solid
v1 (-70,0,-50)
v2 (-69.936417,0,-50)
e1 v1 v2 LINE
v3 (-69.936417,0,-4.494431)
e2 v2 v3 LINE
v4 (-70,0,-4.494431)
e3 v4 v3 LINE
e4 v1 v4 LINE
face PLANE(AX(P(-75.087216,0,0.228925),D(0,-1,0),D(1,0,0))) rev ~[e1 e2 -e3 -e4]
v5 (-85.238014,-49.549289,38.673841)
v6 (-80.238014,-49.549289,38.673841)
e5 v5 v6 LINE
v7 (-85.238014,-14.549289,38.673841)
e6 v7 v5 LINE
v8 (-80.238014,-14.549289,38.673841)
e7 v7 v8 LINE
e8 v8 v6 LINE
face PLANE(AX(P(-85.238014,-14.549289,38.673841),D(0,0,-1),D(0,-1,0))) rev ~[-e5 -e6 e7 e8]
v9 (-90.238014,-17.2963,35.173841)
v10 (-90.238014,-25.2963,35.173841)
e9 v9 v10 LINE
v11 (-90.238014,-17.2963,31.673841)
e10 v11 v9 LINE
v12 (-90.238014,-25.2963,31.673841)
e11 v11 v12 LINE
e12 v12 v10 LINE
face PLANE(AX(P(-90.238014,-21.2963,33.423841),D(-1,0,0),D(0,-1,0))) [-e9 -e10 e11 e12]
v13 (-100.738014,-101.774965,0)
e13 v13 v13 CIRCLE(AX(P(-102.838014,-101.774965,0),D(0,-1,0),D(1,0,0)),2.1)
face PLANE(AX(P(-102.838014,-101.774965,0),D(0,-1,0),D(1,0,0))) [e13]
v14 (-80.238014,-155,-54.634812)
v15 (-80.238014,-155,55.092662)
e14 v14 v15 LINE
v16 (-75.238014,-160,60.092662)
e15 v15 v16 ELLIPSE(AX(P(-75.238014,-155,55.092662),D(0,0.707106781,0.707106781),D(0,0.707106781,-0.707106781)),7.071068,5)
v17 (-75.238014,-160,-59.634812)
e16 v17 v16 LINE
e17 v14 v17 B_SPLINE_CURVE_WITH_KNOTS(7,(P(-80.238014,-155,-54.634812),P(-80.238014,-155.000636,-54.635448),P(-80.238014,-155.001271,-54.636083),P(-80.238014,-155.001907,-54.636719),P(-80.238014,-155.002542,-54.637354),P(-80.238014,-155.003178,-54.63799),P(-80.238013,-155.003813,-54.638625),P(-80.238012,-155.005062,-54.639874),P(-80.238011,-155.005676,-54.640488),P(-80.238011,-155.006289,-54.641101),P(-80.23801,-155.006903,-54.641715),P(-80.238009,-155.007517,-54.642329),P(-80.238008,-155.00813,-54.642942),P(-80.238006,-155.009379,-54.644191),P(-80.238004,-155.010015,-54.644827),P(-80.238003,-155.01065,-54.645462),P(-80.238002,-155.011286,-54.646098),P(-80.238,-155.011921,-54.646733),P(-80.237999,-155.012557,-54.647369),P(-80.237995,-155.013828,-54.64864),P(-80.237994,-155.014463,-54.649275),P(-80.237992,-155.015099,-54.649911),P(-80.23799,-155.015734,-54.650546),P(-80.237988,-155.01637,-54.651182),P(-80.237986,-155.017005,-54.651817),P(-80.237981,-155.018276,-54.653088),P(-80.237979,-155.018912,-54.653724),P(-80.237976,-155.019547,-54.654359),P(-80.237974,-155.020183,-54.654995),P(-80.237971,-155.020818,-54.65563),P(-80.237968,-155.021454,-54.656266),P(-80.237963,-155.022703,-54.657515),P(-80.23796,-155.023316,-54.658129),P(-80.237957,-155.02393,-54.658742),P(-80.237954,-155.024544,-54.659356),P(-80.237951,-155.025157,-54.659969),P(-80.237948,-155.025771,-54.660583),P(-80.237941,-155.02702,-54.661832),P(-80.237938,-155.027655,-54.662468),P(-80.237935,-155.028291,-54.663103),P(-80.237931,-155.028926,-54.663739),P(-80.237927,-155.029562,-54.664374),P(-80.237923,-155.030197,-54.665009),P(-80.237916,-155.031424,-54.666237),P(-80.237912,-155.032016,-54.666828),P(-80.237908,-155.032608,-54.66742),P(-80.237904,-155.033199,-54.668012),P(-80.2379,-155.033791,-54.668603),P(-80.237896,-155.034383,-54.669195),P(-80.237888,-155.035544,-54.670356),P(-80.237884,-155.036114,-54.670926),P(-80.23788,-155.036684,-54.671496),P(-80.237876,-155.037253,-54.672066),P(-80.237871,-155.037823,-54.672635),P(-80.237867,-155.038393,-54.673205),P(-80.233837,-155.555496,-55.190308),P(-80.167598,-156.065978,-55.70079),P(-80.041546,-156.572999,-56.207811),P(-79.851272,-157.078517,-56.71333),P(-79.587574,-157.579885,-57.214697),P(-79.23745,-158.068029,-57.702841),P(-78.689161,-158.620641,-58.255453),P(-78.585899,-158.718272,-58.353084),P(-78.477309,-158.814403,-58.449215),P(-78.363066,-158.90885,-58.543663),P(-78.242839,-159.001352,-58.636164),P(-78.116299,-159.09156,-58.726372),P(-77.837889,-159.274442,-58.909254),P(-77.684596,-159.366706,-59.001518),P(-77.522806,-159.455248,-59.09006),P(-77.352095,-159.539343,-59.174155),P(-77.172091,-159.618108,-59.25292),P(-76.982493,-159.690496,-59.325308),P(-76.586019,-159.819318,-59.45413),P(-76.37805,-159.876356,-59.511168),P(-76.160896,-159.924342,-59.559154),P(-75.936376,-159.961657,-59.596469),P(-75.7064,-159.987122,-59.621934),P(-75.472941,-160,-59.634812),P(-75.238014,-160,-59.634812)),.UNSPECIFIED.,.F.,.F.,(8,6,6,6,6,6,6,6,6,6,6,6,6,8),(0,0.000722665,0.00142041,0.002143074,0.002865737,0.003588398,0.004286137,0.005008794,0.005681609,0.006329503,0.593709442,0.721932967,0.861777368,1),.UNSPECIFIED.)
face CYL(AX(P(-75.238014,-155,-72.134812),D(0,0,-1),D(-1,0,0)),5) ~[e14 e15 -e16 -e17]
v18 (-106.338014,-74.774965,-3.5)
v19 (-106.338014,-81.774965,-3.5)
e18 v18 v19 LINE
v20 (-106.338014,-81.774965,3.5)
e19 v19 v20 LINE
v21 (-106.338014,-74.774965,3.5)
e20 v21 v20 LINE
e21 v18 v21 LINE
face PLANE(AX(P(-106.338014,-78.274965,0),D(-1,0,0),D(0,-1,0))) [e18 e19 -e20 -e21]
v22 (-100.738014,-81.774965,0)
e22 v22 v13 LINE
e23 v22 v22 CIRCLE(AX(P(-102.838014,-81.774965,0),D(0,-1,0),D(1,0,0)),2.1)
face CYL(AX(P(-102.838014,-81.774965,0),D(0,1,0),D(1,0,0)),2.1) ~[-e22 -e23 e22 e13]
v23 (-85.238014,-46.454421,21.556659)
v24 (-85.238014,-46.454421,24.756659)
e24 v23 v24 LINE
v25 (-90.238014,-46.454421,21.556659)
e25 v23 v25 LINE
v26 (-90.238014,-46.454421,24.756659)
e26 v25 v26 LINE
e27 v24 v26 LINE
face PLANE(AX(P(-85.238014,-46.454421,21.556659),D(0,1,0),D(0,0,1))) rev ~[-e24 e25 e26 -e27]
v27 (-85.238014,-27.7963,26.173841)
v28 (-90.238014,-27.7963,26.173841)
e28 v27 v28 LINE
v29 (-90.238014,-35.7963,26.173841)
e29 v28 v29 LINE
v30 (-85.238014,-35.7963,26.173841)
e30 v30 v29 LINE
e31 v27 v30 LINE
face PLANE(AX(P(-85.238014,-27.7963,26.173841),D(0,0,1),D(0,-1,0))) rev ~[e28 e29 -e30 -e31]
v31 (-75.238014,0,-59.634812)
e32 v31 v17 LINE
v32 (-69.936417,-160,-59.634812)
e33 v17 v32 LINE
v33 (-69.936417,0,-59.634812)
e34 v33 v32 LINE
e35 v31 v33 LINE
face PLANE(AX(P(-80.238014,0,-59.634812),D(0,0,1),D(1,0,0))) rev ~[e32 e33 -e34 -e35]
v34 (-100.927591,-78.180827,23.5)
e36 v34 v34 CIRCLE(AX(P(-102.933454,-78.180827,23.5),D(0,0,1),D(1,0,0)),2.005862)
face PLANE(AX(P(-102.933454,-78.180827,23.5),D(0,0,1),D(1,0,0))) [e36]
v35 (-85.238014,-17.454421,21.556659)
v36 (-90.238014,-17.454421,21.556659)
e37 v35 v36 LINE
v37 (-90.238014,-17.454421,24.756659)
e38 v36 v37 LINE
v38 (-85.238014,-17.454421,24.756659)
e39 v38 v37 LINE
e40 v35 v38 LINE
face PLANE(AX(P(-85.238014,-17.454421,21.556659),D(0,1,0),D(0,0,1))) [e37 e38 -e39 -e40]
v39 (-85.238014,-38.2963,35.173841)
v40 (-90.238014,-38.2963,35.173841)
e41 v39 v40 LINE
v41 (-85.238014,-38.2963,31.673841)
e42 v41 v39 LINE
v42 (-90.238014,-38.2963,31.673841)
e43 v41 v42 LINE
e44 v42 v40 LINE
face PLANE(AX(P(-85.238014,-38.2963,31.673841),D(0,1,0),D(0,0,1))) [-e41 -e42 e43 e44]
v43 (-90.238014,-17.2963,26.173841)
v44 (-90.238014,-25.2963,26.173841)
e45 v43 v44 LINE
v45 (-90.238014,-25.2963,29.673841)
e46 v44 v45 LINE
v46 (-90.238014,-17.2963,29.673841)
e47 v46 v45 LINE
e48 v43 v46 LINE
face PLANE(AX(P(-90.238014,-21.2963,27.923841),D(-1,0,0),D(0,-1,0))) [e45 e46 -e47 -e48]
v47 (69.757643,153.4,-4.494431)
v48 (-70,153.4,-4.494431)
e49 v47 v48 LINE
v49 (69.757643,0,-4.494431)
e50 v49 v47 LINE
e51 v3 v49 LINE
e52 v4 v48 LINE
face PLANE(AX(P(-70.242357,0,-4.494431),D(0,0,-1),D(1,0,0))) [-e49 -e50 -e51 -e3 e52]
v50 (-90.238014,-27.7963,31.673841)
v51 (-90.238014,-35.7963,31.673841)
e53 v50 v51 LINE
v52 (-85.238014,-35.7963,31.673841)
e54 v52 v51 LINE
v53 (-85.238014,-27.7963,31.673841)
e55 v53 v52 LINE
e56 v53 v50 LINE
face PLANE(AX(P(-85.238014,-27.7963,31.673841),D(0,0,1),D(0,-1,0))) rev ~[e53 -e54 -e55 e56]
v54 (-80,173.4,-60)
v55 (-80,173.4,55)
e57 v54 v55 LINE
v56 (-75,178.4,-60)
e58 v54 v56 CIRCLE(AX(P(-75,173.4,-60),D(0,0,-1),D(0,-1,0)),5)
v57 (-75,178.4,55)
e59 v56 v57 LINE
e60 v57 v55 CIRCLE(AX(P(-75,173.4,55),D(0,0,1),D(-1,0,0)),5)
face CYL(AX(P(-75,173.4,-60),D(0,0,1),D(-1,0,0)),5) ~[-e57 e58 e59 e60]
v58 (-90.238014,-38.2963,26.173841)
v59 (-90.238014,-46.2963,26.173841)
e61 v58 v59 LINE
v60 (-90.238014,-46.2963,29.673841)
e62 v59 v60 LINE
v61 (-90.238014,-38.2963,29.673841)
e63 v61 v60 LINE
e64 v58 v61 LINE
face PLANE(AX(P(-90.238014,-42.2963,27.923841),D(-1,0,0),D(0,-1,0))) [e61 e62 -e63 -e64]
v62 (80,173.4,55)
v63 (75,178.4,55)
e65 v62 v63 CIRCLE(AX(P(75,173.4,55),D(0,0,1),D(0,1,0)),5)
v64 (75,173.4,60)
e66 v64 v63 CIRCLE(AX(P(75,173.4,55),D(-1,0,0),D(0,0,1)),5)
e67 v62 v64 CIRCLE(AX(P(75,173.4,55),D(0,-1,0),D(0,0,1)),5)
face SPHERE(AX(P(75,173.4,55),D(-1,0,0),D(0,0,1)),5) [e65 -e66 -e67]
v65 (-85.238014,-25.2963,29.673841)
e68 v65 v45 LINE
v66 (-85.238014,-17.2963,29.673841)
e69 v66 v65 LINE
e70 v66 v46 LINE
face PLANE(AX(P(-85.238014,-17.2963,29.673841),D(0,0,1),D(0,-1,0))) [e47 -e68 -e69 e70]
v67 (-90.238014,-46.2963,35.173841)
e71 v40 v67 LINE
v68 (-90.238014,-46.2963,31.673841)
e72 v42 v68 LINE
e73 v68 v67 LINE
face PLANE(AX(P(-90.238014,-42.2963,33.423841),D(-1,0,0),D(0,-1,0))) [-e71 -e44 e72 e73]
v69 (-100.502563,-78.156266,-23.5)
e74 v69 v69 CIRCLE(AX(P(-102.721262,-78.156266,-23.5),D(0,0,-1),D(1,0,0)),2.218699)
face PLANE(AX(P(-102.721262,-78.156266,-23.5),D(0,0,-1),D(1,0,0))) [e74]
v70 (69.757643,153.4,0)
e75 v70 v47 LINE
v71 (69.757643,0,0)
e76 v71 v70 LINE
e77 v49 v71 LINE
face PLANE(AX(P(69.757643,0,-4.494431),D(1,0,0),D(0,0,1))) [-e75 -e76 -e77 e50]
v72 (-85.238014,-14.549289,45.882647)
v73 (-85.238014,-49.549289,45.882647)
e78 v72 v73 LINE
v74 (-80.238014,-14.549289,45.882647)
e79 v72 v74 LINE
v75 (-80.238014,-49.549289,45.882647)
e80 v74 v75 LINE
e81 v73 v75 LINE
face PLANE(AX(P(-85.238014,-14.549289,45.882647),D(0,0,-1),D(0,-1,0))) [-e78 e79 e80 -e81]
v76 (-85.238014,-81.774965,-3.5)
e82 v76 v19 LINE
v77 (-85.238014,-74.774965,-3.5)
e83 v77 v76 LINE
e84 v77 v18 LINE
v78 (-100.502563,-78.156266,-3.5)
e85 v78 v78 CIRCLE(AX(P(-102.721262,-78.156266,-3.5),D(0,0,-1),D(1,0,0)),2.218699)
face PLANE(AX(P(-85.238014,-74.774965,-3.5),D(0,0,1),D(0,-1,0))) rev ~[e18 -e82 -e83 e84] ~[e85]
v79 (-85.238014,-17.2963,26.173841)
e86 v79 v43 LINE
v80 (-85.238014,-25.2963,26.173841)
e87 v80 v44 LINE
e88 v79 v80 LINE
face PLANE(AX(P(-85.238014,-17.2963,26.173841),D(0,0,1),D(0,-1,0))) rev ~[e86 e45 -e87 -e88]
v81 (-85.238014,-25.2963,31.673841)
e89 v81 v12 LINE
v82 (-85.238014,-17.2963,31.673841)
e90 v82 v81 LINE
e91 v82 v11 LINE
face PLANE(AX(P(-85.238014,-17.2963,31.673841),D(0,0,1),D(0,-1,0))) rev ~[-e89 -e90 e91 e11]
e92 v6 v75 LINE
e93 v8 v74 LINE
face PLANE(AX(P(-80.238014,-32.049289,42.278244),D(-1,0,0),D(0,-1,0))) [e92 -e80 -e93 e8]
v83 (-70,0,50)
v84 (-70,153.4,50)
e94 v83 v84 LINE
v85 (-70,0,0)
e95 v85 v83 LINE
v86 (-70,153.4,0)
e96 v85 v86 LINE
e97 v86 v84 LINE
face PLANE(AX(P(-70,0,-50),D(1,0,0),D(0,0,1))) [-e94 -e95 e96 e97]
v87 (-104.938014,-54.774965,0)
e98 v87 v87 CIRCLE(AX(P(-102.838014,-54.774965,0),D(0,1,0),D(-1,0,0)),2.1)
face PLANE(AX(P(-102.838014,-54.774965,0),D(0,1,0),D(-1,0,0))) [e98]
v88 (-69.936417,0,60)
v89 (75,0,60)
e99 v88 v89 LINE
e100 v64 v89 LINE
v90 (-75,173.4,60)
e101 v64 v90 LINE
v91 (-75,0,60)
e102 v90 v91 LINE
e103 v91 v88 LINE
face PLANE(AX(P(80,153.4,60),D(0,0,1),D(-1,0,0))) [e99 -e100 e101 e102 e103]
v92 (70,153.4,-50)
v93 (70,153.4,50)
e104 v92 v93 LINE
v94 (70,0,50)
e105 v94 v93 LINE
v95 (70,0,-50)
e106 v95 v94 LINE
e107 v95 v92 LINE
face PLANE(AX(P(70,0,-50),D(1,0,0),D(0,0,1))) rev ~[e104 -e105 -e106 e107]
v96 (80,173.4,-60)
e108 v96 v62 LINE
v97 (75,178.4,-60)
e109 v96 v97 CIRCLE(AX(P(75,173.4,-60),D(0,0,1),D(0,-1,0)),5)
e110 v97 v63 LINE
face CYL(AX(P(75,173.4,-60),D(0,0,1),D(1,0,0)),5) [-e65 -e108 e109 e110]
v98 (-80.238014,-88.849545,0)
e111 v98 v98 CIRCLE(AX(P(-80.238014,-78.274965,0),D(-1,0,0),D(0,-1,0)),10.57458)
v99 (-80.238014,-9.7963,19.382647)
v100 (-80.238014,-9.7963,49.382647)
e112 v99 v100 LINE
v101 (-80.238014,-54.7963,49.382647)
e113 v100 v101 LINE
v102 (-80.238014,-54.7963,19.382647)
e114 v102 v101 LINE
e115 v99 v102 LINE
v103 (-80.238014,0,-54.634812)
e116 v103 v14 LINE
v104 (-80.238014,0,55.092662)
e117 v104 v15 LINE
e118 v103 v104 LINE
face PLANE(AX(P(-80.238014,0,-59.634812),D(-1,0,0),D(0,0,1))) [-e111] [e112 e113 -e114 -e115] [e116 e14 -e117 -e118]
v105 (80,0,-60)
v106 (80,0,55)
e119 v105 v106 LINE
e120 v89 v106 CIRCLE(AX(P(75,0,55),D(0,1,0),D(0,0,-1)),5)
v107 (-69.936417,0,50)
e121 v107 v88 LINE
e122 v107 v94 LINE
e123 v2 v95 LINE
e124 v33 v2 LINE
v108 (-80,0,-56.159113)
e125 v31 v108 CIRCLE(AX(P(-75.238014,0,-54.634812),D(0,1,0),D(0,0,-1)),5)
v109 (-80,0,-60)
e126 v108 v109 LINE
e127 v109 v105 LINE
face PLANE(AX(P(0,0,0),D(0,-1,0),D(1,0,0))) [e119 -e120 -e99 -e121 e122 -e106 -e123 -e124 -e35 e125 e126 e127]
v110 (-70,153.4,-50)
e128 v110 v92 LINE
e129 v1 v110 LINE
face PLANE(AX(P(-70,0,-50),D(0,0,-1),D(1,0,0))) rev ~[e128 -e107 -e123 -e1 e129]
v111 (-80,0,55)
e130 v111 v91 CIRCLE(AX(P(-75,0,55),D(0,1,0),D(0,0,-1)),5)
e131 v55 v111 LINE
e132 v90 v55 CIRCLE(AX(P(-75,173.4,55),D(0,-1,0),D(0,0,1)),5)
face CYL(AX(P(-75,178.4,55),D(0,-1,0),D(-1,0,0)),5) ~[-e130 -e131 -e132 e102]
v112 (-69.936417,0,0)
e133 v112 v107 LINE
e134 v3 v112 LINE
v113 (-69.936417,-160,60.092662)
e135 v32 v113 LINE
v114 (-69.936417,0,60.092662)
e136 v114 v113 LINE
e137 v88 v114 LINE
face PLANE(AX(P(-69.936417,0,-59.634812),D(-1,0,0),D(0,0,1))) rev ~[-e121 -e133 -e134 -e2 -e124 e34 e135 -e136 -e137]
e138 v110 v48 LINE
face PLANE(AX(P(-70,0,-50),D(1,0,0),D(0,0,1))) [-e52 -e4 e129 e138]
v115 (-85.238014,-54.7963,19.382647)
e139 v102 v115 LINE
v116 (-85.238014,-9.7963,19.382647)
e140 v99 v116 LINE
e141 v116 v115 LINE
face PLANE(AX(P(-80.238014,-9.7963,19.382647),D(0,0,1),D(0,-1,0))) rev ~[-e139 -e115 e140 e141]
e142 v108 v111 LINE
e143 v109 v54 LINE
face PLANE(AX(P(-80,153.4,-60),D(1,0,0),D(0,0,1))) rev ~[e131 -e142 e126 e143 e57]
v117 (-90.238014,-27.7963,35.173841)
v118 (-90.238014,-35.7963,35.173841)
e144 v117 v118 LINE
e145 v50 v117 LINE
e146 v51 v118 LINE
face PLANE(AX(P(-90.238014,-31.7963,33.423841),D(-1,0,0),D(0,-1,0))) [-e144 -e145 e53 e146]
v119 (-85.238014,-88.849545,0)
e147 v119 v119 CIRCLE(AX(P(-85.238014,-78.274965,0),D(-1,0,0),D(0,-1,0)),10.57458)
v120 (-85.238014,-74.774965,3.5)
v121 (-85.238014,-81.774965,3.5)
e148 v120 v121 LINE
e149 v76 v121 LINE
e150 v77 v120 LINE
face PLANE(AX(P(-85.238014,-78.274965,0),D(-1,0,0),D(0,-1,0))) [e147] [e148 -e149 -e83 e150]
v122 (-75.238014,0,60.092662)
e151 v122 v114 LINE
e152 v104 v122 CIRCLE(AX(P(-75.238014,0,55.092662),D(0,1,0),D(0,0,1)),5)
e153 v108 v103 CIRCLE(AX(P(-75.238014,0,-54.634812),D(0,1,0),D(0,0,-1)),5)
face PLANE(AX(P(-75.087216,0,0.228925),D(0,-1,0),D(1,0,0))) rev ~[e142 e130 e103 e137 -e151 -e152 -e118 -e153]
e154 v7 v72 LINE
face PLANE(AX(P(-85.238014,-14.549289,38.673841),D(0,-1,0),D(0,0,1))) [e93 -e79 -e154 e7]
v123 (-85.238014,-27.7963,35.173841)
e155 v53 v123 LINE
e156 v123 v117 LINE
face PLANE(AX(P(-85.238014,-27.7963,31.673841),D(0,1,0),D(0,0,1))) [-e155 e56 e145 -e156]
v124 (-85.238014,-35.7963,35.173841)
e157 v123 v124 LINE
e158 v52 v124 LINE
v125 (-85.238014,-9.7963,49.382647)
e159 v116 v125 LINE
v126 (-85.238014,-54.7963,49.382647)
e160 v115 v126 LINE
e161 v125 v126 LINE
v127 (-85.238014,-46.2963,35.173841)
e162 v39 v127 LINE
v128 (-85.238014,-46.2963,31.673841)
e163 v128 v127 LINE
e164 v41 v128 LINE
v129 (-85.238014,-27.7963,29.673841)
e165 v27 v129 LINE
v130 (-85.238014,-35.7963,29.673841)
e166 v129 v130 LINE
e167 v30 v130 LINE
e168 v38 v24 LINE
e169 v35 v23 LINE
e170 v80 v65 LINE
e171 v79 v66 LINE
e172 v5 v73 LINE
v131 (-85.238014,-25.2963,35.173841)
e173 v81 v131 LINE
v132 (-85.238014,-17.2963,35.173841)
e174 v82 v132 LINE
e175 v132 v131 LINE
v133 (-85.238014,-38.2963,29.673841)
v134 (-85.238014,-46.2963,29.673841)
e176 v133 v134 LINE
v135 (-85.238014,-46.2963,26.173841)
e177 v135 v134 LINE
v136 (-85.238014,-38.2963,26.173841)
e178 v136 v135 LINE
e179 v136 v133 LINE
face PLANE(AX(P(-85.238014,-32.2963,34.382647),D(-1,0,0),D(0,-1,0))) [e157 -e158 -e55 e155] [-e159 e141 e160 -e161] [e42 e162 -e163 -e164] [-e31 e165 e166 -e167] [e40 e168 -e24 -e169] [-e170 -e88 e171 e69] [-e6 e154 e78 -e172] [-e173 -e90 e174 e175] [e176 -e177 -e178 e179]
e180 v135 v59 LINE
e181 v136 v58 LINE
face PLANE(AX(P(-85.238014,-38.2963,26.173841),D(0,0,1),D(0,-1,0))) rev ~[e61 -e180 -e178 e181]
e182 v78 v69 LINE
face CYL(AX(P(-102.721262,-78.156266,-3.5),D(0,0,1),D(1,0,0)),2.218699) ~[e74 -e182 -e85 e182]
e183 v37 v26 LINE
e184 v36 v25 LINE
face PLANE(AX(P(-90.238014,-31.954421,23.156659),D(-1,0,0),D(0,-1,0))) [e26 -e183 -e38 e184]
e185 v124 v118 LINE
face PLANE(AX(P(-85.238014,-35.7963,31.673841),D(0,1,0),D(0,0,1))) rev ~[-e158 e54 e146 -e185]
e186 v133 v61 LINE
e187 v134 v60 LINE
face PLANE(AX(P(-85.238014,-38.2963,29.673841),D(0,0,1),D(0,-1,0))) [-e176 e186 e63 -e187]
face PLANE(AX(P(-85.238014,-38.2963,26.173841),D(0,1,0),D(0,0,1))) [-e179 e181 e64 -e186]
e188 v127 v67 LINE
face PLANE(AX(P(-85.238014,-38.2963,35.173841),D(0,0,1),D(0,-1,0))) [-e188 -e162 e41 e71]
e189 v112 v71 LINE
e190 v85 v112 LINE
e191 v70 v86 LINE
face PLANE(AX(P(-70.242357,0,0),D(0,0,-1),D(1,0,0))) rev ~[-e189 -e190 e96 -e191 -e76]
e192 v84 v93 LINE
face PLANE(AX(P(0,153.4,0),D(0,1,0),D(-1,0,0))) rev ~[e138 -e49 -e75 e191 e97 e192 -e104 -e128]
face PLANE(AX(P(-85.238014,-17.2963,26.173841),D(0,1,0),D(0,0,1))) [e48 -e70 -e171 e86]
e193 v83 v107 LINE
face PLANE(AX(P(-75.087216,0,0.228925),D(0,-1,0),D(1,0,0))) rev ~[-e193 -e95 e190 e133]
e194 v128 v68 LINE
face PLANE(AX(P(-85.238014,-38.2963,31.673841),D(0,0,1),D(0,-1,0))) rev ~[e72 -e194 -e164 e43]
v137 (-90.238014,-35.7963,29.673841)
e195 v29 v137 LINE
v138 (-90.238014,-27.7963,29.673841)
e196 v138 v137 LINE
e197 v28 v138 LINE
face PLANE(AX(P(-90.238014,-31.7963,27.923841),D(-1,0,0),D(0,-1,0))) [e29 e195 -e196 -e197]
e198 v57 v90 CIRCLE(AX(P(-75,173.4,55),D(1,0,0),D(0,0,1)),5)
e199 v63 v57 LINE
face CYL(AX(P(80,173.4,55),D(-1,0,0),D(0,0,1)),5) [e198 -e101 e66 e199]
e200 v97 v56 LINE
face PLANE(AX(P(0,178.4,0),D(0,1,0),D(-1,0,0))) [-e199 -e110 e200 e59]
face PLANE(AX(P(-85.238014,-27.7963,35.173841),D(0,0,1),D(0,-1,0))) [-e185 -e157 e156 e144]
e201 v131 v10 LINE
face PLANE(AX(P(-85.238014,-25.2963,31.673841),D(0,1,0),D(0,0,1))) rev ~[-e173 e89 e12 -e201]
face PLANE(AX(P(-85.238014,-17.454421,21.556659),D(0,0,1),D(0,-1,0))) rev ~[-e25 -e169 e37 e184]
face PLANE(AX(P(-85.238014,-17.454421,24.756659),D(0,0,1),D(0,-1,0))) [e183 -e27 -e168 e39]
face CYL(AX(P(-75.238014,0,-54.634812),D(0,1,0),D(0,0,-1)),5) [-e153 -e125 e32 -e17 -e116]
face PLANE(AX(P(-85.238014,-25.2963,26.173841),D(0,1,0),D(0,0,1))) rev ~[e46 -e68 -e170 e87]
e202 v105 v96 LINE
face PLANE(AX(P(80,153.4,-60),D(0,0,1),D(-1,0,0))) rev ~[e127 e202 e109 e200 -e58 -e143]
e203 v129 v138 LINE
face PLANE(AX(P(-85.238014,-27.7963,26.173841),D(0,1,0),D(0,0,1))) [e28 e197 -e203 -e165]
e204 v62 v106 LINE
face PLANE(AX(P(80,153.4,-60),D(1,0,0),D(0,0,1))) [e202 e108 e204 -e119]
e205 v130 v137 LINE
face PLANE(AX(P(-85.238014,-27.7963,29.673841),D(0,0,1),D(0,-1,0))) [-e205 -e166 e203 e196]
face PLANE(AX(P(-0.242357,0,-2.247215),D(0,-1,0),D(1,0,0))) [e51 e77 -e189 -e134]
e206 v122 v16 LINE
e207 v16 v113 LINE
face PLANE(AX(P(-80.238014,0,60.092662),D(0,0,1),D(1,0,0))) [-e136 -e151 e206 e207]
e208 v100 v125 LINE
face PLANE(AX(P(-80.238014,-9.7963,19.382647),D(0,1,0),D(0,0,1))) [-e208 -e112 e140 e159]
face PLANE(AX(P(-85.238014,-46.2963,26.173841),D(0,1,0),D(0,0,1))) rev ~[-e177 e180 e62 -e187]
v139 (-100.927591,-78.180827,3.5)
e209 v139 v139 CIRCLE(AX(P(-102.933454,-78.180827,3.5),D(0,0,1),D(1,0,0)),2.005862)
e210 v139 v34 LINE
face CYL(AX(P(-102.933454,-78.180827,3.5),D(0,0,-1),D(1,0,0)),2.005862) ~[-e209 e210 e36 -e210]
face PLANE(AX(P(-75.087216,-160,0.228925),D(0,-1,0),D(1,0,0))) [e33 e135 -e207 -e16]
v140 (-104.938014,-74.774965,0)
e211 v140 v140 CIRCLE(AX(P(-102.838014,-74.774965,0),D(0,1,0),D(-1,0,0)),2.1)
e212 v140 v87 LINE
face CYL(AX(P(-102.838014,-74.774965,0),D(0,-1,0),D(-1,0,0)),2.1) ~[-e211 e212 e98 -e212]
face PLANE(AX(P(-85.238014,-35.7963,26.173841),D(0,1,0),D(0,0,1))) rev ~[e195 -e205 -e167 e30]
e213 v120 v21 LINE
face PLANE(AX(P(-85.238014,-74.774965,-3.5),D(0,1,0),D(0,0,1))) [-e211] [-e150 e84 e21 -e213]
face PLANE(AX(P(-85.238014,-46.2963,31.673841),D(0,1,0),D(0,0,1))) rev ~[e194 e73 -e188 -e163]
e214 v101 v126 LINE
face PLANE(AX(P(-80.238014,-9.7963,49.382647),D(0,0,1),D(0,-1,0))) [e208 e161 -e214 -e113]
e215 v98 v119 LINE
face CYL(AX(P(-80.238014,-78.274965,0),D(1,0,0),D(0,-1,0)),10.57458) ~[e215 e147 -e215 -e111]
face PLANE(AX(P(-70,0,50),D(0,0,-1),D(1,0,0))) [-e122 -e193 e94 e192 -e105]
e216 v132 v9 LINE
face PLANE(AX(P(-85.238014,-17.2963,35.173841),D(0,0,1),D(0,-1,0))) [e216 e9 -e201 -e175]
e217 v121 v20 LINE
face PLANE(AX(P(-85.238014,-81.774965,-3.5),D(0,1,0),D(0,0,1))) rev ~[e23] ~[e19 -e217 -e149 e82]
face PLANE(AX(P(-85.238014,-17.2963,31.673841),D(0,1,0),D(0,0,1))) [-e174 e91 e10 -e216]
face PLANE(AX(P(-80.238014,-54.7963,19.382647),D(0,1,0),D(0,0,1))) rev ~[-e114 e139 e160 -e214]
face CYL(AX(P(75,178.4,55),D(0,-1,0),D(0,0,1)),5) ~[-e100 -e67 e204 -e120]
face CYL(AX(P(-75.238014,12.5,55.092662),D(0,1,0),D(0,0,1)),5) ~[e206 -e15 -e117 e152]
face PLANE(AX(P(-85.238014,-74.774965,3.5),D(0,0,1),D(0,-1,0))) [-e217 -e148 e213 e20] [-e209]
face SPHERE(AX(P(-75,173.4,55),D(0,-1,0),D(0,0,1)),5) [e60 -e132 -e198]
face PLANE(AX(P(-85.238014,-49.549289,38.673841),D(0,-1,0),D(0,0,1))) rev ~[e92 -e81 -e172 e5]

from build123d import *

# Parameters (mm, degrees)
F0_W         = 160
F0_H         = 120
F0_W_2       = 140
F0_H_2       = 100
F1_DEPTH     = 153.4
F2_W         = 160
F2_H         = 120
F3_DEPTH     = 25
F5_W         = 3
F5_H         = 25
F5_W_2       = 2.5065724061
F5_H_2       = 21.7677888939
F7_W         = 10.3015974164
F7_H         = 119.727473706
F8_DEPTH     = 160
F9_R         = 10.5745800983
F10_DEPTH    = 5
F11_W        = 7
F11_H        = 7
F12_DEPTH    = 21.1
F13_R        = 2.005862126
F14_DEPTH    = 20
F15_R        = 2.1
F16_DEPTH    = 20
F17_R        = 2.1
F18_DEPTH    = 20
F19_R        = 2.218699255
F20_DEPTH    = 20
F21_W        = 45
F21_H        = 30
F22_DEPTH    = 5
F23_W        = 35
F23_H        = 7.2088057839
F24_DEPTH    = 5
F25_W        = 8
F25_H        = 3.5
F26_DEPTH    = 5
F27_W        = 140
F27_H        = 4.4944308201
F28_DEPTH    = 176
F29_W        = 29
F29_H        = 3.2
F30_DEPTH    = 5
F31_R        = 5
F32_T1_DEPTH = 185
F32_T3_DEPTH = 144.727473706
F32_T5_DEPTH = 172.5


# Not quite as in the source:
# - a fillet or chamfer that OpenCascade refuses, or shapes differently, is made with other operations: its cross-section is extruded or revolved along the edge and cut away or added


with BuildPart() as f1:
    # F0 (on Front) → F1 (new body)
    with BuildSketch(Plane.XZ):
        Rectangle(F0_W, F0_H)
        Rectangle(F0_W_2, F0_H_2, mode=Mode.SUBTRACT)
    extrude(amount=-F1_DEPTH)

    # F2 (on face) → F3 (join)
    with BuildSketch(Plane(origin=(0, 153.4, 0), x_dir=(-1, 0, 0), z_dir=(0, 1, 0))):
        Rectangle(F2_W, F2_H)
    extrude(amount=F3_DEPTH)

    # F5 (on face) → F6 (revolve)
    with BuildSketch(Plane.XZ):
        with Locations((-75.5, 22.5)):
            Rectangle(F5_W, F5_H)
        with Locations((-75.746713797, -24.116105553)):
            Rectangle(F5_W_2, F5_H_2)
    revolve(axis=Axis((-74, 0, 22.5), (0, 0, -1)))

    # F7 (on face) → F8 (join)
    with BuildSketch(Plane.XZ):
        with Locations((-75.0872157514, 0.2289246768)):
            Rectangle(F7_W, F7_H)
    extrude(amount=F8_DEPTH)

    # F9 (on face) → F10 (join)
    with BuildSketch(Plane(origin=(-80.2380144596, 0, 0), x_dir=(0, -1, 0), z_dir=(-1, 0, 0))):
        with Locations((78.2749652863, 0)):
            Circle(F9_R)
    extrude(amount=F10_DEPTH)

    # F11 (on face) → F12 (join)
    with BuildSketch(Plane(origin=(-85.2380144596, 0, 0), x_dir=(0, -1, 0), z_dir=(-1, 0, 0))):
        with Locations((78.2749652863, 0)):
            Rectangle(F11_W, F11_H)
    extrude(amount=F12_DEPTH)

    # F13 (on face) → F14 (join)
    with BuildSketch(Plane.XY.offset(3.5)):
        with Locations((-102.9334535655, -78.1808274122)):
            Circle(F13_R)
    extrude(amount=F14_DEPTH)

    # F15 (on face) → F16 (join)
    with BuildSketch(Plane(origin=(0, -74.7749652863, 0), x_dir=(-1, 0, 0), z_dir=(0, 1, 0))):
        with Locations((102.8380144596, 0)):
            Circle(F15_R)
    extrude(amount=F16_DEPTH)

    # F17 (on face) → F18 (join)
    with BuildSketch(Plane.XZ.offset(81.7749652863)):
        with Locations((-102.8380144596, 0)):
            Circle(F17_R)
    extrude(amount=F18_DEPTH)

    # F19 (on face) → F20 (join)
    with BuildSketch(Plane(origin=(0, 0, -3.5), x_dir=(1, 0, 0), z_dir=(0, 0, -1))):
        with Locations((-102.7212624934, 78.1562660312)):
            Circle(F19_R)
    extrude(amount=F20_DEPTH)

    # F21 (on face) → F22 (join)
    with BuildSketch(Plane(origin=(-80.2380144596, 0, 0), x_dir=(0, -1, 0), z_dir=(-1, 0, 0))):
        with Locations((32.2962999344, 34.3826470941)):
            Rectangle(F21_W, F21_H)
    extrude(amount=F22_DEPTH)

    # F23 (on face) → F24 (cut)
    with BuildSketch(Plane(origin=(-85.2380144596, 0, 0), x_dir=(0, -1, 0), z_dir=(-1, 0, 0))):
        with Locations((32.0492885076, 42.2782442022)):
            Rectangle(F23_W, F23_H)
    extrude(amount=-F24_DEPTH, mode=Mode.SUBTRACT)

    # F25 (on face) → F26 (join)
    with BuildSketch(Plane(origin=(-85.2380144596, 0, 0), x_dir=(0, -1, 0), z_dir=(-1, 0, 0))):
        with Locations((21.2962999344, 33.4238413102)):
            Rectangle(F25_W, F25_H)
        with Locations((31.7962999344, 33.4238413102)):
            Rectangle(F25_W, F25_H)
        with Locations((42.2962999344, 33.4238413102)):
            Rectangle(F25_W, F25_H)
        with Locations((21.2962999344, 27.9238413102)):
            Rectangle(F25_W, F25_H)
        with Locations((31.7962999344, 27.9238413102)):
            Rectangle(F25_W, F25_H)
        with Locations((42.2962999344, 27.9238413102)):
            Rectangle(F25_W, F25_H)
    extrude(amount=F26_DEPTH)

    # F27 (on face) → F28 (join)
    with BuildSketch(Plane.XZ):
        with Locations((-0.2423568684, -2.24721541)):
            Rectangle(F27_W, F27_H)
    extrude(amount=-F28_DEPTH)

    # F29 (on face) → F30 (join)
    with BuildSketch(Plane(origin=(-85.2380144596, 0, 0), x_dir=(0, -1, 0), z_dir=(-1, 0, 0))):
        with Locations((31.9544213465, 23.1566587463)):
            Rectangle(F29_W, F29_H)
    extrude(amount=F30_DEPTH)

    # F31
    f31_edges = [f1.edges().sort_by_distance(p)[0] for p in [
        (-80, 89.2, 60),
        (0, 178.4, 60),
        (80, 89.2, 60),
        (80, 178.4, 0),
        (-80, 178.4, 0),
    ]]
    fillet(f31_edges, radius=F31_R)

    # F32: fillet of radius 5 on 3 edges, made by hand

    # F32_s2 → F32_t1 (cut)
    with BuildSketch(Plane.XZ.offset(-12.5)):
        with BuildLine():
            ThreePointArc((-75.2380144596, 60.0926615298), (-78.7735483655, 58.6281954357), (-80.2380144596, 55.0926615298))
            Line((-80.2380144596, 55.0926615298), (-80.2380144596, 60.0926615298))
            Line((-80.2380144596, 60.0926615298), (-75.2380144596, 60.0926615298))
        make_face()
    extrude(amount=F32_T1_DEPTH, mode=Mode.SUBTRACT)

    # F32_s4 → F32_t3 (cut)
    with BuildSketch(Plane.XY.offset(-72.1348121762)):
        with BuildLine():
            ThreePointArc((-80.2380144596, -155), (-78.7735483655, -158.5355339059), (-75.2380144596, -160))
            Line((-75.2380144596, -160), (-80.2380144596, -160))
            Line((-80.2380144596, -160), (-80.2380144596, -155))
        make_face()
    extrude(amount=F32_T3_DEPTH, mode=Mode.SUBTRACT)

    # F32_s6 → F32_t5 (cut)
    with BuildSketch(Plane.XZ):
        with BuildLine():
            ThreePointArc((-75.2380144596, -59.6348121762), (-78.7735483655, -58.1703460822), (-80.2380144596, -54.6348121762))
            Line((-80.2380144596, -54.6348121762), (-80.2380144596, -59.6348121762))
            Line((-80.2380144596, -59.6348121762), (-75.2380144596, -59.6348121762))
        make_face()
    extrude(amount=F32_T5_DEPTH, mode=Mode.SUBTRACT)


solid = f1.part
